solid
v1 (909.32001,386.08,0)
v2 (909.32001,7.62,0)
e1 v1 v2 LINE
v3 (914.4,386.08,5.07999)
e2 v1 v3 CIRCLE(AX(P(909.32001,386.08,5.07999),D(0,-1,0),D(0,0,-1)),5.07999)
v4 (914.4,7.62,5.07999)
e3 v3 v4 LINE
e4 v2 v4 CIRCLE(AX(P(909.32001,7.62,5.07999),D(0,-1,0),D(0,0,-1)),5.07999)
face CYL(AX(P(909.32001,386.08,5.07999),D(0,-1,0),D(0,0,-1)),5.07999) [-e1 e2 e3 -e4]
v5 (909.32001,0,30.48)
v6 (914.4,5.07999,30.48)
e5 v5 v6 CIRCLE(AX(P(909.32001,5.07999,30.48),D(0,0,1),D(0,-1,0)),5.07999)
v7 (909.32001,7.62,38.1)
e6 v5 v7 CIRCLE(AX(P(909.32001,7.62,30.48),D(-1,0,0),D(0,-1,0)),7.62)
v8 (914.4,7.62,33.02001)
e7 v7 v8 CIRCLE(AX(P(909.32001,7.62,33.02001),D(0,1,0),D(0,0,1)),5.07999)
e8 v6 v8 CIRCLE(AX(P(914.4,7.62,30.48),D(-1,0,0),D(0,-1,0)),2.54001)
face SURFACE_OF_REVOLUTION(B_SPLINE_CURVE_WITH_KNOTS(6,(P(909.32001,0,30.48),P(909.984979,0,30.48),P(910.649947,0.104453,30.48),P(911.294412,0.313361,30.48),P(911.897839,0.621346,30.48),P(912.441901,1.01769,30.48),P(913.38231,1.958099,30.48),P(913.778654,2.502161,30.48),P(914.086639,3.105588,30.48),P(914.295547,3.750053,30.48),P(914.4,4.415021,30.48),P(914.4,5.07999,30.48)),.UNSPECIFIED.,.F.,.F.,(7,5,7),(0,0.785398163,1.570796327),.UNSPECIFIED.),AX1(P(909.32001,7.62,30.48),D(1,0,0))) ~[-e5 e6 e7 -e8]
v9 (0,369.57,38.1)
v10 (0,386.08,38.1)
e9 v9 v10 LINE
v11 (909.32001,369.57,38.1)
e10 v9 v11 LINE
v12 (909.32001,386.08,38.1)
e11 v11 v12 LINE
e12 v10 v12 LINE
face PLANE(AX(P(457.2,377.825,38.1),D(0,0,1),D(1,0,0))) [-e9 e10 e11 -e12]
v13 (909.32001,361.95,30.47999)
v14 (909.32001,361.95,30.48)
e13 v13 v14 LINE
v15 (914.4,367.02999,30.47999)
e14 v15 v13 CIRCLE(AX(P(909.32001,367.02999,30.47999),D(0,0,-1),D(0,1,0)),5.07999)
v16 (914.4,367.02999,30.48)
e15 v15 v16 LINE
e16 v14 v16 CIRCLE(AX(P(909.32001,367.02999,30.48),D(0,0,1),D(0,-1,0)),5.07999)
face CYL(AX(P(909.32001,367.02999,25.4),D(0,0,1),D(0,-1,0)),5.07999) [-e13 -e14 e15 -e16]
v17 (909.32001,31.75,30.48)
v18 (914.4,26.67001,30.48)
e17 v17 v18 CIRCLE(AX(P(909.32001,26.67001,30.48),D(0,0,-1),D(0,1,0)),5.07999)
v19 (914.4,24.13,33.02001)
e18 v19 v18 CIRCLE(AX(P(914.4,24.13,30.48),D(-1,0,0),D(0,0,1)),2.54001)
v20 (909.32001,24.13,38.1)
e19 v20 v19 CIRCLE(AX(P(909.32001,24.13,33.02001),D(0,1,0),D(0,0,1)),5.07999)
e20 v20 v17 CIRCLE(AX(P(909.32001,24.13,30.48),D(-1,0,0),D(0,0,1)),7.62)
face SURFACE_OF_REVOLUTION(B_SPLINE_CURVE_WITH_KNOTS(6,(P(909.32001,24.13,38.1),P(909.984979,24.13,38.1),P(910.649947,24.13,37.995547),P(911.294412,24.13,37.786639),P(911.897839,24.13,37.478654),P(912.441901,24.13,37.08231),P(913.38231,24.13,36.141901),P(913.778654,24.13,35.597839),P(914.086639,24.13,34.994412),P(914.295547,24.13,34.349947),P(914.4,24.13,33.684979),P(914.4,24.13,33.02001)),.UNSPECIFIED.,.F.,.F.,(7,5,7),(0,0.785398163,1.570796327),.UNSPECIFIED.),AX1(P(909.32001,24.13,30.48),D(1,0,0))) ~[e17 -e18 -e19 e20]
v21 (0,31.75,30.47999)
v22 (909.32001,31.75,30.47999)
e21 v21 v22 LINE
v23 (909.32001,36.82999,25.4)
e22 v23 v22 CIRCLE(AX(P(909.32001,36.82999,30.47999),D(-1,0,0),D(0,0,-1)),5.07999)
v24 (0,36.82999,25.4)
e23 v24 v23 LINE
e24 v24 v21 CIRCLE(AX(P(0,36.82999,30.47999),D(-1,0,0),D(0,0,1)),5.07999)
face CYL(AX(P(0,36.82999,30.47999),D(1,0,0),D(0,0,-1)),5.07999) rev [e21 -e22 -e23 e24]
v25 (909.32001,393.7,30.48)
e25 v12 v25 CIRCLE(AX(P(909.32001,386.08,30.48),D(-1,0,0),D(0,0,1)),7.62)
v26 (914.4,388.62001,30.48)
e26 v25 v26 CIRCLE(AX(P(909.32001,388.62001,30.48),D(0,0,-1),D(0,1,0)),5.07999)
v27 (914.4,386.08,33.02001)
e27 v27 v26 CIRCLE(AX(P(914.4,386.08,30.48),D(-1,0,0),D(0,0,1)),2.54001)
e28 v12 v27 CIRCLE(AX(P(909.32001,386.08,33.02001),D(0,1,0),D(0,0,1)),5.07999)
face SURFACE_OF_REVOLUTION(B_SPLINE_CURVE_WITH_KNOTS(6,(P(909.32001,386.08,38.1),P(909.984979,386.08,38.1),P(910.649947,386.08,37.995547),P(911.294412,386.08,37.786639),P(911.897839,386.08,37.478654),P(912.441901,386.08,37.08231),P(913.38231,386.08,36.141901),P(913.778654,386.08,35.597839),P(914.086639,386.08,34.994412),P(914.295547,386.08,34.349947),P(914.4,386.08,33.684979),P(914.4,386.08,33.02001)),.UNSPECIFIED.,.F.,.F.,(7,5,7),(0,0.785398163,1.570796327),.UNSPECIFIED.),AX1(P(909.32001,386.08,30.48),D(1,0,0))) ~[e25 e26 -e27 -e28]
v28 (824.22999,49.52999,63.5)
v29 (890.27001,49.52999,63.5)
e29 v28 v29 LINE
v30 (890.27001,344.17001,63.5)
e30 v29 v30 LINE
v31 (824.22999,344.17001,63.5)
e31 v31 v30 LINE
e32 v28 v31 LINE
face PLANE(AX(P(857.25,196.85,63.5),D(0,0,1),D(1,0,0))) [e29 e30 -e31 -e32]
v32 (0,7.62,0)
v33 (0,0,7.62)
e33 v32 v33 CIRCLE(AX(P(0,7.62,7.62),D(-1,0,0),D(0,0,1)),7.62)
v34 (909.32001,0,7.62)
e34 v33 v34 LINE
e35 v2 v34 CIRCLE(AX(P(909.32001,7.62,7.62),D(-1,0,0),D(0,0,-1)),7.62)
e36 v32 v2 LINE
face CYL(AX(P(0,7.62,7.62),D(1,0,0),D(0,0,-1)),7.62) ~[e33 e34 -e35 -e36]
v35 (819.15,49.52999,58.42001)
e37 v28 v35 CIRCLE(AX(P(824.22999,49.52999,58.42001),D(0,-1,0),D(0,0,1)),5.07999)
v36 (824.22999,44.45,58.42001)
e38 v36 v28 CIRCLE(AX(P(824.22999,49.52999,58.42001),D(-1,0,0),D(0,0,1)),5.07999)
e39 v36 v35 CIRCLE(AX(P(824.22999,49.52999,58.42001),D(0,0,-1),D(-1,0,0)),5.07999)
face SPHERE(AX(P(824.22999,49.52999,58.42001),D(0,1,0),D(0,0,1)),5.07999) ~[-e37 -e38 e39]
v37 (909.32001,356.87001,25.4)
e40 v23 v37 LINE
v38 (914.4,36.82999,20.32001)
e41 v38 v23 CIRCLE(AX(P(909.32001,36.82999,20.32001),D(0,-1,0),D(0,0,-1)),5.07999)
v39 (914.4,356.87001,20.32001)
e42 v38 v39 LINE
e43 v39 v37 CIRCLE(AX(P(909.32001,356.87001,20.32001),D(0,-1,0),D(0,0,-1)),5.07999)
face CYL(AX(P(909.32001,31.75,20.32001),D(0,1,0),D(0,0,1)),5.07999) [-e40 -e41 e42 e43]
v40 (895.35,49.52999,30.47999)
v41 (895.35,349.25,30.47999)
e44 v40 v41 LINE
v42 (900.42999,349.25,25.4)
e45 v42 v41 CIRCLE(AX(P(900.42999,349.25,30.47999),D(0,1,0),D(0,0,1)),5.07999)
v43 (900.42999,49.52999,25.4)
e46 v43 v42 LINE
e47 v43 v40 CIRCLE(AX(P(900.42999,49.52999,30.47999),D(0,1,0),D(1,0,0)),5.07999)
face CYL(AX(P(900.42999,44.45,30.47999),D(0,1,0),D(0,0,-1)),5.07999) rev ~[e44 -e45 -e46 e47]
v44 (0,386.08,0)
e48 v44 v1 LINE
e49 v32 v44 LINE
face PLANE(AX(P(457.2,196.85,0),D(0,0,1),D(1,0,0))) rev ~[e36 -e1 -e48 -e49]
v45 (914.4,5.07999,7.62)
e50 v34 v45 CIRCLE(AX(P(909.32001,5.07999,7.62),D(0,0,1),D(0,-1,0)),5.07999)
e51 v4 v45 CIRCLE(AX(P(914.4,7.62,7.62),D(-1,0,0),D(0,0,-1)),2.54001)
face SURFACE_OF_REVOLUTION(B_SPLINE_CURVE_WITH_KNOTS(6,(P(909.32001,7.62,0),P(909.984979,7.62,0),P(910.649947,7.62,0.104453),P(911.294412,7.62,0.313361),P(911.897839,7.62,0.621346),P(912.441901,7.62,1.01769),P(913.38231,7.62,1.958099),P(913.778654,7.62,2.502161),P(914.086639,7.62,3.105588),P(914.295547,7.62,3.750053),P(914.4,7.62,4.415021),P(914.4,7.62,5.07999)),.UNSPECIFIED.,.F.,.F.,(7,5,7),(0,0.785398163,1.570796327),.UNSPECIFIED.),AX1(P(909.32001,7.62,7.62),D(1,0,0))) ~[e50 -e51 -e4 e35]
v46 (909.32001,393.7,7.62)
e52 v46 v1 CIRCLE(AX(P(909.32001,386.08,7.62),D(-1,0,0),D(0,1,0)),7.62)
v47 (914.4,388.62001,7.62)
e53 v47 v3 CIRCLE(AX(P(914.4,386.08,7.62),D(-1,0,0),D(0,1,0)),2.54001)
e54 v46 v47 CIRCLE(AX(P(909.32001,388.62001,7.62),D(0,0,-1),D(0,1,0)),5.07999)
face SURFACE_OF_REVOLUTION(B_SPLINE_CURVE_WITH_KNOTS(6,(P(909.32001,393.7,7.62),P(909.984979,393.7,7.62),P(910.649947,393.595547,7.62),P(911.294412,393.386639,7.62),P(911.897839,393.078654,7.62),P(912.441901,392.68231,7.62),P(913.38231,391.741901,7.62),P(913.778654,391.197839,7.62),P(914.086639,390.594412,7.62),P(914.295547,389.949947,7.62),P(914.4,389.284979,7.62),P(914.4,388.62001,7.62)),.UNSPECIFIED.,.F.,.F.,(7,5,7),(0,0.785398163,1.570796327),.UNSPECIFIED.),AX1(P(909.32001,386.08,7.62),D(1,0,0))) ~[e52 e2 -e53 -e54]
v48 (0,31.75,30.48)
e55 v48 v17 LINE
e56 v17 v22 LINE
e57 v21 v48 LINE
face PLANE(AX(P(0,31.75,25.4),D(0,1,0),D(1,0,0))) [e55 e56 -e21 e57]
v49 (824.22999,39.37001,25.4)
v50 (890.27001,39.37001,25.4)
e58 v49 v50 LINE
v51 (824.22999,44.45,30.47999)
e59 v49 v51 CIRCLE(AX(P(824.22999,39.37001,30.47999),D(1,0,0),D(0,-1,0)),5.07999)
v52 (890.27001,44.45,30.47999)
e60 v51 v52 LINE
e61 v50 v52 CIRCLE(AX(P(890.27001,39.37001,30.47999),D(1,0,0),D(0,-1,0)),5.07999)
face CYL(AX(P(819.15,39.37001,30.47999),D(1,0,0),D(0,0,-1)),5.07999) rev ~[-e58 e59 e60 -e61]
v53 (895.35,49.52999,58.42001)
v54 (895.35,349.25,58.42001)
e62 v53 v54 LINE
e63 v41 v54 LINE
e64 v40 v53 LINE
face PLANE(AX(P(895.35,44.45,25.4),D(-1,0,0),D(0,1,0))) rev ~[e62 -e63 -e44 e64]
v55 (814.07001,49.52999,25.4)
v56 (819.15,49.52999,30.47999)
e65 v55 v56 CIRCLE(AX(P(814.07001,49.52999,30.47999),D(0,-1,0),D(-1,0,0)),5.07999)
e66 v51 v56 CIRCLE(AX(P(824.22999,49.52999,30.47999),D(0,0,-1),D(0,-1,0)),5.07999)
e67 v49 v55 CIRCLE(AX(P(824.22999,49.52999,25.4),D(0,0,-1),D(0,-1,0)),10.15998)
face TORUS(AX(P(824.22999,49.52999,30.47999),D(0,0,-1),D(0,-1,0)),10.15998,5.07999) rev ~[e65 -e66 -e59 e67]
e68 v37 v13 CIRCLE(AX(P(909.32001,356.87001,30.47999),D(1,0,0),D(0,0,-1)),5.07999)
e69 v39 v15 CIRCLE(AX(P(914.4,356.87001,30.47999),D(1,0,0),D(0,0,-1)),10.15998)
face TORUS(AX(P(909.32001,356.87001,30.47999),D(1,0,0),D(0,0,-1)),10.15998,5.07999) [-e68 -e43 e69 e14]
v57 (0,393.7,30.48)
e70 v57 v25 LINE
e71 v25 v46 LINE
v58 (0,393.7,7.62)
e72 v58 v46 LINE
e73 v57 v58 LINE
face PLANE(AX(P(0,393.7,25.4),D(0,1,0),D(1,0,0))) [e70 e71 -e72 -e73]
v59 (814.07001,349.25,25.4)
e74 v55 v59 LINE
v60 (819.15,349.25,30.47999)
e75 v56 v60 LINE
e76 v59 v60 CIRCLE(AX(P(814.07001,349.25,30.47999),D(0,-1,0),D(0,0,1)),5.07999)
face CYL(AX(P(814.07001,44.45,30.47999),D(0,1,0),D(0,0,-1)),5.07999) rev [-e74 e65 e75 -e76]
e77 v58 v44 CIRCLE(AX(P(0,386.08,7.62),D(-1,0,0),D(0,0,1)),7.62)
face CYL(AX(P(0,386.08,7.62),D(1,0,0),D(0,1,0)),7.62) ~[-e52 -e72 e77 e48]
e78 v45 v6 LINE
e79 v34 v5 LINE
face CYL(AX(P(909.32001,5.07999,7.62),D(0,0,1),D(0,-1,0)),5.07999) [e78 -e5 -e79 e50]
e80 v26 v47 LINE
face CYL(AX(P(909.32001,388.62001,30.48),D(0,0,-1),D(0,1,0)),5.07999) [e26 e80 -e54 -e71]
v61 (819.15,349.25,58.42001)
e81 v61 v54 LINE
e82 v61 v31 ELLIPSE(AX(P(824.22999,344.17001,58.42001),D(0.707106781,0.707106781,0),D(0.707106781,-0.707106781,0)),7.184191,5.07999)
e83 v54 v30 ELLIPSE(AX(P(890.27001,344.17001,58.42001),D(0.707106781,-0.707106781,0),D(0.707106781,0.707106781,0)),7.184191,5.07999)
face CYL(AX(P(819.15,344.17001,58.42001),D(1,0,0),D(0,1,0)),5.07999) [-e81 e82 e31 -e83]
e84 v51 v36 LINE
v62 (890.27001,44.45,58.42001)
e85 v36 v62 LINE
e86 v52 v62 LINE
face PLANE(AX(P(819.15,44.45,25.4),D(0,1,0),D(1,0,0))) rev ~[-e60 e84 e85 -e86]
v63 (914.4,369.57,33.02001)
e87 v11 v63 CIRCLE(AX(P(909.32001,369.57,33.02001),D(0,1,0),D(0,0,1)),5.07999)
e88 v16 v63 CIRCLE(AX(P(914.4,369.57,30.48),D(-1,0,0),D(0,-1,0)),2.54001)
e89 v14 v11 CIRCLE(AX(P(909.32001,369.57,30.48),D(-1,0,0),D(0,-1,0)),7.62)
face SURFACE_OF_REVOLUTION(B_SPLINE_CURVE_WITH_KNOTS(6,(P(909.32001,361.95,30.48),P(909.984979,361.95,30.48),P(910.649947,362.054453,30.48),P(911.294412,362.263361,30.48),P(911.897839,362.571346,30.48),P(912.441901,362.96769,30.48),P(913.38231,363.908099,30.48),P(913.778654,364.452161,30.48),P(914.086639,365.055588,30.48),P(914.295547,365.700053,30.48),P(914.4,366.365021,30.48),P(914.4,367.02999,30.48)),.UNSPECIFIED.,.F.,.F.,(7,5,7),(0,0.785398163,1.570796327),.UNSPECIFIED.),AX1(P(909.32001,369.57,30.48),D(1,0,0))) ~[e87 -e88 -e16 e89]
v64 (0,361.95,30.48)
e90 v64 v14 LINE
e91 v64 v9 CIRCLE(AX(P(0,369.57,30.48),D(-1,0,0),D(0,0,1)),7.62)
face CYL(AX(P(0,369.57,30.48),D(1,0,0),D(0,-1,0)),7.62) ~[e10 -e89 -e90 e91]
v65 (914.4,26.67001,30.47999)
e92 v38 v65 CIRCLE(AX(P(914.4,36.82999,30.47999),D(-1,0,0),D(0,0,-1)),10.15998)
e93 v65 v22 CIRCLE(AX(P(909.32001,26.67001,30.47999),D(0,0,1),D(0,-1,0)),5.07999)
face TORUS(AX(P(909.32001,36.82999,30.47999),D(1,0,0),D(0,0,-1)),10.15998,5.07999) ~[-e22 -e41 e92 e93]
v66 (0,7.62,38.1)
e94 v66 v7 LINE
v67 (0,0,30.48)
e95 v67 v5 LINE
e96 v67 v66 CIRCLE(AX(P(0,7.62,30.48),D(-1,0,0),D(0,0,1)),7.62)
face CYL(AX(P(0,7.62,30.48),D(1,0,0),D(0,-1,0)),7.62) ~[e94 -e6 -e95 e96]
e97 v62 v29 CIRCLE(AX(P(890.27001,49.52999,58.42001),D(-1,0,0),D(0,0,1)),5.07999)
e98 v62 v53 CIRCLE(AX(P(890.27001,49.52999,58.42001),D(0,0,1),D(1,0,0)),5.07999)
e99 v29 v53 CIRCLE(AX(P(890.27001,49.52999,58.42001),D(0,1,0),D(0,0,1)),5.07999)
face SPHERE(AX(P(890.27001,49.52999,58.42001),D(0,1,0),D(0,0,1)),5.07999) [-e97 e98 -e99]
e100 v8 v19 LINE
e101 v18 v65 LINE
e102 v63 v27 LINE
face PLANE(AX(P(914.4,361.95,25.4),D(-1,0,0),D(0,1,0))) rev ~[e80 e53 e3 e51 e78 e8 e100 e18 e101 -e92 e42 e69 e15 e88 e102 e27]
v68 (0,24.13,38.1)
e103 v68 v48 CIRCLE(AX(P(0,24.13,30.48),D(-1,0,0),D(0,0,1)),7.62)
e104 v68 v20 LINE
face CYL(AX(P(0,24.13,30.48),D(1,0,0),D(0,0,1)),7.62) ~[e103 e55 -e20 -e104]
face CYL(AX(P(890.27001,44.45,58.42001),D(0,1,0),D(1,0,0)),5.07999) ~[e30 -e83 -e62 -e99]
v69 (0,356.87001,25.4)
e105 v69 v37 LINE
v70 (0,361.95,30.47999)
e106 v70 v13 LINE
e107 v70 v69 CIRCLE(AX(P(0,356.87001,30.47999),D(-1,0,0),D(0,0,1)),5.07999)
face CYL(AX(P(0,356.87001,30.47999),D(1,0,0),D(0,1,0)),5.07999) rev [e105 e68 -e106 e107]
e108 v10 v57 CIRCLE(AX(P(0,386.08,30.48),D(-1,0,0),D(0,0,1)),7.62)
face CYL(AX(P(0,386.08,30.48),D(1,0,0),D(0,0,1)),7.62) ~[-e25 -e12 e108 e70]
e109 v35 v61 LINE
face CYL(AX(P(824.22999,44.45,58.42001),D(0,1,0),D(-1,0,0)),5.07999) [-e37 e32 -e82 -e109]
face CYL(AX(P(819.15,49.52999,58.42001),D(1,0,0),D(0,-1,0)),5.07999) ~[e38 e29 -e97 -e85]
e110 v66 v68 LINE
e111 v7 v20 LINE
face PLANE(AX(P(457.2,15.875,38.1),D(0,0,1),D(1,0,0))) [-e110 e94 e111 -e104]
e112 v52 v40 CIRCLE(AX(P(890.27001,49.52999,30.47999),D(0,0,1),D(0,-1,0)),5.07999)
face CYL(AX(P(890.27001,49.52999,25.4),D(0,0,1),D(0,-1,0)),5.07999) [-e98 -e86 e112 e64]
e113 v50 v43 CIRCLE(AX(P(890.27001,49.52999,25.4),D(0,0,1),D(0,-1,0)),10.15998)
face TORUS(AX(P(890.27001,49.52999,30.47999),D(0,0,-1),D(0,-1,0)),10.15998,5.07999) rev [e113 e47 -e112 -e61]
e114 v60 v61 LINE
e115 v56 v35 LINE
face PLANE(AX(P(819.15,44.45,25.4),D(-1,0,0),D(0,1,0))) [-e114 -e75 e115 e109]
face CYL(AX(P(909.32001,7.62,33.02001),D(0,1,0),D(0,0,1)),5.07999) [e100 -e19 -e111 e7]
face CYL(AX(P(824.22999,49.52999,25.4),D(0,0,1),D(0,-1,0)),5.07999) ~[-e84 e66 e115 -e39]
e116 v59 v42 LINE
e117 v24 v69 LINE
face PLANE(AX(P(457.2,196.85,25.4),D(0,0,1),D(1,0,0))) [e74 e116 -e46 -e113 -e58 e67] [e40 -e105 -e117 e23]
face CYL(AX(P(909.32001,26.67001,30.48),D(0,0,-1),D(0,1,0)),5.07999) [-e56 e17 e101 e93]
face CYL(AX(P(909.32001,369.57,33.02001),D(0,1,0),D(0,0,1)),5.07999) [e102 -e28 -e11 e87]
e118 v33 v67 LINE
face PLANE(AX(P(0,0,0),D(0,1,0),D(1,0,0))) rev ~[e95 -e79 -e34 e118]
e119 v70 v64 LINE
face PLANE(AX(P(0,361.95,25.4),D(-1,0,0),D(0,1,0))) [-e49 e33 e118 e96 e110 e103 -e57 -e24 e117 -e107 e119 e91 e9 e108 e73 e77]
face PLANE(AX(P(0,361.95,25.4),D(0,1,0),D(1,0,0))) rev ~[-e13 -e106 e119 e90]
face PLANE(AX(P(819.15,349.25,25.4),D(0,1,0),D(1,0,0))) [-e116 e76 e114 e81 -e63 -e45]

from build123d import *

# Parameters (mm, degrees)
F0_W     = 914.4
F0_H     = 393.7
F1_DEPTH = 25.4
F2_W     = 914.4
F2_H     = 31.75
F3_DEPTH = 12.7
F4_W     = 76.2
F4_H     = 304.8
F5_DEPTH = 38.1
F6_R     = 7.62
F7_R     = 5.07999


# Not quite as in the source:
# - a fillet or chamfer is up to 0.001 mm smaller than in the source, because OpenCascade refuses the exact size


with BuildPart() as f1:
    # F0 (on Top) → F1 (new body)
    with BuildSketch(Plane.XY):
        with Locations((457.2, 196.85)):
            Rectangle(F0_W, F0_H)
    extrude(amount=F1_DEPTH)

    # F2 (on face) → F3 (join)
    with BuildSketch(Plane.XY.offset(25.4)):
        with Locations((457.2, 377.825)):
            Rectangle(F2_W, F2_H)
        with Locations((457.2, 15.875)):
            Rectangle(F2_W, F2_H)
    extrude(amount=F3_DEPTH)

    # F4 (on face) → F5 (join)
    with BuildSketch(Plane.XY.offset(25.4)):
        with Locations((857.25, 196.85)):
            Rectangle(F4_W, F4_H)
    extrude(amount=F5_DEPTH)

    # F6
    f6_edges = [f1.edges().sort_by_distance(p)[0] for p in [
        (457.2, 393.7, 38.1),
        (457.2, 361.95, 38.1),
        (457.2, 31.75, 38.1),
        (457.2, 0, 38.1),
        (457.2, 393.7, 0),
        (457.2, 0, 0),
    ]]
    fillet(f6_edges, radius=F6_R)

    # F7 (radius 5.08 in the source; OpenCascade refuses exactly that, so slightly less here)
    f7_edges = [f1.edges().sort_by_distance(p)[0] for p in [
        (895.35, 196.85, 63.5),
        (857.25, 349.25, 63.5),
        (819.15, 196.85, 63.5),
        (857.25, 44.45, 63.5),
        (819.15, 44.45, 44.45),
        (895.35, 44.45, 44.45),
        (857.25, 44.45, 25.4),
        (457.2, 31.75, 25.4),
        (457.2, 361.95, 25.4),
        (914.4, 196.85, 25.4),
        (914.4, 393.7, 19.05),
        (914.4, 391.468154, 35.868154),
        (914.4, 391.468154, 2.231846),
        (914.4, 377.825, 38.1),
        (914.4, 196.85, 0),
        (914.4, 364.181846, 35.868154),
        (914.4, 2.231846, 2.231846),
        (914.4, 0, 19.05),
        (895.35, 196.85, 25.4),
        (819.15, 196.85, 25.4),
        (914.4, 2.231846, 35.868154),
        (914.4, 15.875, 38.1),
        (914.4, 29.518154, 35.868154),
    ]]
    fillet(f7_edges, radius=F7_R)


solid = f1.part
